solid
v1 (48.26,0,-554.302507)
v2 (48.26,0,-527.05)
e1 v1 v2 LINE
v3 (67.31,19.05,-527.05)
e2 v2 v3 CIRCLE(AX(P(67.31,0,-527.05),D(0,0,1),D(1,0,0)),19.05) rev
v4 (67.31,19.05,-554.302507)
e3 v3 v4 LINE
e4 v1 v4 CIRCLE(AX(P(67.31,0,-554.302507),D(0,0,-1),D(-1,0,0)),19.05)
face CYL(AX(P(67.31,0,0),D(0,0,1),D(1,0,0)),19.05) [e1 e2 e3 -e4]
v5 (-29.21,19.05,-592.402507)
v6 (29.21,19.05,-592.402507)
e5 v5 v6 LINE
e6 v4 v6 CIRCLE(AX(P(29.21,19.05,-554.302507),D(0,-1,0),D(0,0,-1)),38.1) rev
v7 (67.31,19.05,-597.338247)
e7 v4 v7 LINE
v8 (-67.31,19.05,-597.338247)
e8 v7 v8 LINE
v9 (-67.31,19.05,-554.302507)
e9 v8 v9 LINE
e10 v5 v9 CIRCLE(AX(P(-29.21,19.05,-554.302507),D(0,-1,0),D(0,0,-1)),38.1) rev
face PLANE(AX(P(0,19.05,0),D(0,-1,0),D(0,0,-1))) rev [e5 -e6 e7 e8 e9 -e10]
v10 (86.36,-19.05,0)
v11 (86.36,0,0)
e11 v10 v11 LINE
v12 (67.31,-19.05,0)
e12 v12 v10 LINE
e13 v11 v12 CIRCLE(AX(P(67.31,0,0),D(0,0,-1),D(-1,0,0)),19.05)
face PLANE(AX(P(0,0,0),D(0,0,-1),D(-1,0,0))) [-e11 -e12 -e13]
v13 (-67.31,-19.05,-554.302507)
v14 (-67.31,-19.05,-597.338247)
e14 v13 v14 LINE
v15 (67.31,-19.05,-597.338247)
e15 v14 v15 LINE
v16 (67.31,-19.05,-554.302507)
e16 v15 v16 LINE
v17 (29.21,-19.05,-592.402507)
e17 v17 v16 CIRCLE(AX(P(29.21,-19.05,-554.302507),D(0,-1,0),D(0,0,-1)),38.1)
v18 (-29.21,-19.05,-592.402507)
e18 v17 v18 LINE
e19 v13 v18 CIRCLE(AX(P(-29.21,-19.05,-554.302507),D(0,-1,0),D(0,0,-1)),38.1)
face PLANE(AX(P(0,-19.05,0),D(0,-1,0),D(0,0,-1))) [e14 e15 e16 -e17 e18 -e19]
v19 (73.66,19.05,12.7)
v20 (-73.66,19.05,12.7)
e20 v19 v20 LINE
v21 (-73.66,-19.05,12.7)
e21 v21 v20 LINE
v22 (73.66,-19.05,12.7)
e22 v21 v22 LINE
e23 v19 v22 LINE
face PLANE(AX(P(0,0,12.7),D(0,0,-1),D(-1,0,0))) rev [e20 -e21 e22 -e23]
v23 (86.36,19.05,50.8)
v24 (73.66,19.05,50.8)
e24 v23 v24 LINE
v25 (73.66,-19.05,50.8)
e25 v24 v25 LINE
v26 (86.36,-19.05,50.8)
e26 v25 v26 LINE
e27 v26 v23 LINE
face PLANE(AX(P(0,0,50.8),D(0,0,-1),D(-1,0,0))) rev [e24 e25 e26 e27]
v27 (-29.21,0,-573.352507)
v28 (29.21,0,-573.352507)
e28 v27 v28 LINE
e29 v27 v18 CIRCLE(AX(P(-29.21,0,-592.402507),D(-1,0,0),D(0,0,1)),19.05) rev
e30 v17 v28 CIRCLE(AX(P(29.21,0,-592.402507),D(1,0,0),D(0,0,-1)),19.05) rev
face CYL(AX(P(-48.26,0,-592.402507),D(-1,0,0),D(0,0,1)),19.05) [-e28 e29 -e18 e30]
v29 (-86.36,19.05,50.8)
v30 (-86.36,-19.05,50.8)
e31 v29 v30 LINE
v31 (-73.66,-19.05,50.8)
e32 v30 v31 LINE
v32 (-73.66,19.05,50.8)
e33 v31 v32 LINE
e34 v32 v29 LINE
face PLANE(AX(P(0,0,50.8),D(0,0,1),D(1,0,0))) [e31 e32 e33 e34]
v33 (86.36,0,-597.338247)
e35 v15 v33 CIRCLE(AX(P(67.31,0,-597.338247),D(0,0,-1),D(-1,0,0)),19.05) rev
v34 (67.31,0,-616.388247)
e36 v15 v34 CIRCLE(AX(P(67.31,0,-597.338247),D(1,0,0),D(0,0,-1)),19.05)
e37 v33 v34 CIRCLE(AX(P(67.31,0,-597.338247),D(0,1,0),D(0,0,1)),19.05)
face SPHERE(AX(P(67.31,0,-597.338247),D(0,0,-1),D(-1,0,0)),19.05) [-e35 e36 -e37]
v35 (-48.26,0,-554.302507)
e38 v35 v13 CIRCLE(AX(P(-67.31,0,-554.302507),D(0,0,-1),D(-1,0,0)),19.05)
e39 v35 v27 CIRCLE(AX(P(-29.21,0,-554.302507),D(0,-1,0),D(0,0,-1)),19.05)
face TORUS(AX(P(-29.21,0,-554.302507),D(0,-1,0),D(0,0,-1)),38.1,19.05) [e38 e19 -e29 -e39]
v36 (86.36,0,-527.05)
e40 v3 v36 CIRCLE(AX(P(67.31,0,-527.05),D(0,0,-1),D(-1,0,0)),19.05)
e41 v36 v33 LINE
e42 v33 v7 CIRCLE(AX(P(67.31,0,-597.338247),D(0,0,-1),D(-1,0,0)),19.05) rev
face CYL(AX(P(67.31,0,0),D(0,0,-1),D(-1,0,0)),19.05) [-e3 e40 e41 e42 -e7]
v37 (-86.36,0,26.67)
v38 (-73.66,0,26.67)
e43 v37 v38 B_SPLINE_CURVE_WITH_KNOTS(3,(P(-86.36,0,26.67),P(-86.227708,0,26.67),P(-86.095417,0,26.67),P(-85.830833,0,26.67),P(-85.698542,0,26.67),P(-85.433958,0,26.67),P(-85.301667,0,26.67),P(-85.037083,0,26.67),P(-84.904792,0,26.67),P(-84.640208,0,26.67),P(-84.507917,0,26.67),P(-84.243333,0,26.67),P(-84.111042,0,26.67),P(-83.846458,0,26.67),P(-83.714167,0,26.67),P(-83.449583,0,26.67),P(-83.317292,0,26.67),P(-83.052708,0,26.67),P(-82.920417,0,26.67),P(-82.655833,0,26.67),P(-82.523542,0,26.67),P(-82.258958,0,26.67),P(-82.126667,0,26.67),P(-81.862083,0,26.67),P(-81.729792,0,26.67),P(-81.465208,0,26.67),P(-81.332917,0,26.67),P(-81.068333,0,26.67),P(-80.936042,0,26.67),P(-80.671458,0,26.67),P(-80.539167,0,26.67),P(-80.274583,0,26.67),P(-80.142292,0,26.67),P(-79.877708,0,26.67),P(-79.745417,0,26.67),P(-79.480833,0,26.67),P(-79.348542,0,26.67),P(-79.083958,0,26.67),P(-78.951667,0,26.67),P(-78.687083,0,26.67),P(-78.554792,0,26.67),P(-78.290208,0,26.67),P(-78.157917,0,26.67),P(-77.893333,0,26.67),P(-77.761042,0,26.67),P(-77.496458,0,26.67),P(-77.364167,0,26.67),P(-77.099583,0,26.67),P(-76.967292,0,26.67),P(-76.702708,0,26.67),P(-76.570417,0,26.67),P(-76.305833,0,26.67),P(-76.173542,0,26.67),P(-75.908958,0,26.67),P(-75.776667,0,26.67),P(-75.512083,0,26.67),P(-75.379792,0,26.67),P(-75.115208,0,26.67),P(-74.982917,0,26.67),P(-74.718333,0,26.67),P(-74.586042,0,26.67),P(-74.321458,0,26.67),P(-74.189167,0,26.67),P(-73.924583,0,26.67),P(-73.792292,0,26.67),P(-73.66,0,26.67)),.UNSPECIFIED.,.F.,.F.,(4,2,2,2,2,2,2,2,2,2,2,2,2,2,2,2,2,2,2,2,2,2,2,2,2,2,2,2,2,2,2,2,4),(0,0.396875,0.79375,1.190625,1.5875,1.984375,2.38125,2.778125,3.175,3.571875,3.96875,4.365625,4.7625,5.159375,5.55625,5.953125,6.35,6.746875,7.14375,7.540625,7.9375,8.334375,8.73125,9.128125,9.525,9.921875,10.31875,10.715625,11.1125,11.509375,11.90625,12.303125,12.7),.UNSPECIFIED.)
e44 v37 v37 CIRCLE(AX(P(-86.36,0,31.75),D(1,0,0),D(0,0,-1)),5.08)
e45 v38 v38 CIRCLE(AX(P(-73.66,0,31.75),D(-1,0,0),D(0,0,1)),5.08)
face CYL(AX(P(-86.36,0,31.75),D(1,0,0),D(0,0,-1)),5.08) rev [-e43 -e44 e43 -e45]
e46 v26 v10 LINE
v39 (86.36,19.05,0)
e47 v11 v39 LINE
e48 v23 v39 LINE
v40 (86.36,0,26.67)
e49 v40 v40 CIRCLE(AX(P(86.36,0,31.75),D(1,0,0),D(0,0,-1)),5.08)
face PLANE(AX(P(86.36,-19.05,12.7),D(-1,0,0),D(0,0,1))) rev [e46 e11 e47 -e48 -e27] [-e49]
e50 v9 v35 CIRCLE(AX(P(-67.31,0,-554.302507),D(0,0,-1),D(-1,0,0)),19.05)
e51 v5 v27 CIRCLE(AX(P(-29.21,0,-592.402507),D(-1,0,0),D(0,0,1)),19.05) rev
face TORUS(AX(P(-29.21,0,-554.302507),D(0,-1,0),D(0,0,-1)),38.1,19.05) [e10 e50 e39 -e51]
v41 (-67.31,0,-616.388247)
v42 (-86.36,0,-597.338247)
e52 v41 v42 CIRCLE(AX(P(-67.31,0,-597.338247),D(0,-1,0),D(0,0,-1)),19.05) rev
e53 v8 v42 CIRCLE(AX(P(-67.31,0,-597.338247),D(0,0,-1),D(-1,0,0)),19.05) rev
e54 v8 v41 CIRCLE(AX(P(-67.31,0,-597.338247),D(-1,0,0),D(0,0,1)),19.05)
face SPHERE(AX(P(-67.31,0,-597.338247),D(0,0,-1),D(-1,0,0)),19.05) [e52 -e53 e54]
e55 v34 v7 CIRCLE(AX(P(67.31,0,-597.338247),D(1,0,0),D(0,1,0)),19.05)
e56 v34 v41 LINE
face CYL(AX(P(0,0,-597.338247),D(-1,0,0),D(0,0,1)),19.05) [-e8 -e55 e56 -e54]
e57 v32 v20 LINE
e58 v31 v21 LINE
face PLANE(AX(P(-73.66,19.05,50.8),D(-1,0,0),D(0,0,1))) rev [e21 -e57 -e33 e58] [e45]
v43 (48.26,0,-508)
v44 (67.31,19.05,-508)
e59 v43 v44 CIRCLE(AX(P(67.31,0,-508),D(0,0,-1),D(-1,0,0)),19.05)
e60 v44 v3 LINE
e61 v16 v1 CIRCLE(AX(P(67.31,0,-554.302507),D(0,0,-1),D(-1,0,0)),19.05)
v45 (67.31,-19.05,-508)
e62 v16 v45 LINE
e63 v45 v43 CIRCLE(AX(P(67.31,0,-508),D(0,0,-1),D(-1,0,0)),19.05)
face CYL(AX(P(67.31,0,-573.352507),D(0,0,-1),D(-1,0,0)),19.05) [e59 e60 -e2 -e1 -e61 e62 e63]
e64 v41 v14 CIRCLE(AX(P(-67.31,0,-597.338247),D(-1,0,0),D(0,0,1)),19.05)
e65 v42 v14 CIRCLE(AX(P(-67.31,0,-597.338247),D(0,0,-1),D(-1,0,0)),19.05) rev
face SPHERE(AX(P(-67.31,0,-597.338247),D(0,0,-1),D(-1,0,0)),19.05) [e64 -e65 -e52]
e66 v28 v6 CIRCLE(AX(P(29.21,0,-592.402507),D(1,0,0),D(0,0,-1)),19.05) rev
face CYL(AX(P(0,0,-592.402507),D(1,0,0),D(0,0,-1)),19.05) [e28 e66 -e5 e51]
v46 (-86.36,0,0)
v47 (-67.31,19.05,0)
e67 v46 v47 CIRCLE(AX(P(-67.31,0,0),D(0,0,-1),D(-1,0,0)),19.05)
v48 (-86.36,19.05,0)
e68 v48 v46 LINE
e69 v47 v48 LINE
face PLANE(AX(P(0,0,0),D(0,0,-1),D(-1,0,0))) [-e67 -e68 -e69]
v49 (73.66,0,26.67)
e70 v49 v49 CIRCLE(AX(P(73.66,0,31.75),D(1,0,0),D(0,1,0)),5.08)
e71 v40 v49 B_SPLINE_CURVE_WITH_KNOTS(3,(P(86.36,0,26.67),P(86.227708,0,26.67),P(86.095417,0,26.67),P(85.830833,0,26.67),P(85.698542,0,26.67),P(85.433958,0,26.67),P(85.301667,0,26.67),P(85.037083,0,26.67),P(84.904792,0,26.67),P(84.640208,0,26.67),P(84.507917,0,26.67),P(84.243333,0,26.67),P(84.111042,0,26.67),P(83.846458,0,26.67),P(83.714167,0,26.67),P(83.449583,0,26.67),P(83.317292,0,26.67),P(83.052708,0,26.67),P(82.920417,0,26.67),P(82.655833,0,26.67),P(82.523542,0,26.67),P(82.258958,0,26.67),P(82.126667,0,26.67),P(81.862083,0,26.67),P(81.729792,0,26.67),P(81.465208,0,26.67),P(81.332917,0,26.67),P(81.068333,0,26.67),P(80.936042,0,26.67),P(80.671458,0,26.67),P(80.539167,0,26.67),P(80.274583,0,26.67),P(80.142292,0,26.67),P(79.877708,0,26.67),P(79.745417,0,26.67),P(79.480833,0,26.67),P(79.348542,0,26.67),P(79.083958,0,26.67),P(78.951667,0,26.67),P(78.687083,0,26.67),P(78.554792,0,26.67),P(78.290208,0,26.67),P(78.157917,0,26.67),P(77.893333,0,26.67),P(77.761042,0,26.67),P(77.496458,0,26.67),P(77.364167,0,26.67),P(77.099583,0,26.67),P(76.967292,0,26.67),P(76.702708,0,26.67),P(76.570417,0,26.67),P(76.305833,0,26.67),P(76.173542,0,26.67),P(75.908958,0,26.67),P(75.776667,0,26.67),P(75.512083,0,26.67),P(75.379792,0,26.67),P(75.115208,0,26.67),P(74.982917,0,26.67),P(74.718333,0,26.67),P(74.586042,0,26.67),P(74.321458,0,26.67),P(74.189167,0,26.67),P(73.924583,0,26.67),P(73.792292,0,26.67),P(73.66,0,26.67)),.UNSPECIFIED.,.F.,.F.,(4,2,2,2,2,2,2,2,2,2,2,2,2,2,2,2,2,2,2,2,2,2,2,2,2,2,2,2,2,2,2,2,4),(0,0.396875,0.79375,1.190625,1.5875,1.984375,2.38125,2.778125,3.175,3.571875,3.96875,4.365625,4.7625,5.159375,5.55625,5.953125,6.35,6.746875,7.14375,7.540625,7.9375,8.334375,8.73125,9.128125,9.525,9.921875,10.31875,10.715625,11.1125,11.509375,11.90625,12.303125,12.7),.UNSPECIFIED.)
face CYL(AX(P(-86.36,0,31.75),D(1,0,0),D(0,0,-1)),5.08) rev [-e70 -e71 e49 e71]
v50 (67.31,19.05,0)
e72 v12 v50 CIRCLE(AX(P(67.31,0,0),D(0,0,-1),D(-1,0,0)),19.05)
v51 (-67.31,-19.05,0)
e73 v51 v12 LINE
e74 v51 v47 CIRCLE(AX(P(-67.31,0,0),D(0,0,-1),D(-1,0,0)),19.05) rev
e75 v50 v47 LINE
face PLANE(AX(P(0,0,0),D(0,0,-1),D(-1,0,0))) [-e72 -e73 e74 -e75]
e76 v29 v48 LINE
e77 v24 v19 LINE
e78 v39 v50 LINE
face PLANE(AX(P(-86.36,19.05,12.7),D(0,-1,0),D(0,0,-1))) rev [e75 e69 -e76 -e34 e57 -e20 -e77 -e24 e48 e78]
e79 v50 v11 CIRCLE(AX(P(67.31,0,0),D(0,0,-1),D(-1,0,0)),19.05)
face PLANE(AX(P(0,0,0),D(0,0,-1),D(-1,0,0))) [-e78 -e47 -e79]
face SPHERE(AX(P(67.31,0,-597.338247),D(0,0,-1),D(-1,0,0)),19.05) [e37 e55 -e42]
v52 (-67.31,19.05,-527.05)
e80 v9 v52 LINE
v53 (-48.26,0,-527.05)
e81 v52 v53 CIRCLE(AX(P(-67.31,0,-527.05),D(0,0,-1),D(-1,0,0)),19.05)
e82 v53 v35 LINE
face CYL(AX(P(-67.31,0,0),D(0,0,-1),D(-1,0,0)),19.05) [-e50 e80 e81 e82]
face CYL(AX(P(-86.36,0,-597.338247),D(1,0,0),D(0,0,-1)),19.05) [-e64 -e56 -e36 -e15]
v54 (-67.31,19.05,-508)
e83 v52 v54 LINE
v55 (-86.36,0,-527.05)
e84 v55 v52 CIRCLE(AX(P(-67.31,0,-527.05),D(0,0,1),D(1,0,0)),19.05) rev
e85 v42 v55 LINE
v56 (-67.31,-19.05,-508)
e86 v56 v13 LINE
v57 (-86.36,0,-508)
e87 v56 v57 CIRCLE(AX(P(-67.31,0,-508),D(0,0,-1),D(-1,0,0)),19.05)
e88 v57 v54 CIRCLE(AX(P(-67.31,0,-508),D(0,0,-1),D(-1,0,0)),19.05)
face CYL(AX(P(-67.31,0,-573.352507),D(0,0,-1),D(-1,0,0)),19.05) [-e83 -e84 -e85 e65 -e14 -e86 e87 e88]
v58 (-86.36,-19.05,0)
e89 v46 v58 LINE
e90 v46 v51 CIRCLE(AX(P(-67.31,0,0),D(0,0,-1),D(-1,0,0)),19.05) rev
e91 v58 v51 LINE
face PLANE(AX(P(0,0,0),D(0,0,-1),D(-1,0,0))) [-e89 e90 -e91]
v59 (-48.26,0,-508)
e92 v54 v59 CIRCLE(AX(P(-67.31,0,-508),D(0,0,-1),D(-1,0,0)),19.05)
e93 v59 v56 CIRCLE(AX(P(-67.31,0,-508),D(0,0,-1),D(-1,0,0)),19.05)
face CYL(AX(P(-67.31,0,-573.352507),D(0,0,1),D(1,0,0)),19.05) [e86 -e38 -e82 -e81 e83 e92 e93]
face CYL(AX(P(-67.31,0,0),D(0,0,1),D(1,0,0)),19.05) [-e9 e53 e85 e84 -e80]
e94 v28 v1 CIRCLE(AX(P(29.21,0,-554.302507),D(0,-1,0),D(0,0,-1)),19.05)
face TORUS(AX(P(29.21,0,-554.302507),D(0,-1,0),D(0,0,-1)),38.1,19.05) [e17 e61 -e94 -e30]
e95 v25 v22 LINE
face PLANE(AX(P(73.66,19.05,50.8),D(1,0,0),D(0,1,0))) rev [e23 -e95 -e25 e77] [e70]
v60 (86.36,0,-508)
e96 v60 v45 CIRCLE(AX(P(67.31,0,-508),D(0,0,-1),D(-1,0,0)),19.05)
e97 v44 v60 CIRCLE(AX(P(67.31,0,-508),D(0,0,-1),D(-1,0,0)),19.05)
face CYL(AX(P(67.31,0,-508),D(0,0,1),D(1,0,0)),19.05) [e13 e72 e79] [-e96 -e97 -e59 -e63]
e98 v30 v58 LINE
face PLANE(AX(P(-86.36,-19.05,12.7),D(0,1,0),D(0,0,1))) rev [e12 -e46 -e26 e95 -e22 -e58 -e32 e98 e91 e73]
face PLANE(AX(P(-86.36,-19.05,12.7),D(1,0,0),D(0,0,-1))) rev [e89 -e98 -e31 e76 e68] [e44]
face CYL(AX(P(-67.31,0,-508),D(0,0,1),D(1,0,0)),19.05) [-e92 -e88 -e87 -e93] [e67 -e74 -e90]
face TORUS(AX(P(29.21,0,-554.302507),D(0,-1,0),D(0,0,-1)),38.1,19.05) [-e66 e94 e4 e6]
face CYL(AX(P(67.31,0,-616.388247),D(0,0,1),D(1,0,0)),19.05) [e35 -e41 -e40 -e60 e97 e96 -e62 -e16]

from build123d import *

# Parameters (mm, degrees)
SKETCH1_W               = 172.72
SKETCH1_H               = 38.1
BOSS_EXTRUDE1_DEPTH     = 12.7
SKETCH2_W               = 12.7
SKETCH2_H               = 38.1
BOSS_EXTRUDE2_DEPTH     = 38.1
SKETCH3_R               = 19.05
BOSS_EXTRUDE3_DEPTH     = 508
BOSS_EXTRUDE5_DEPTH     = 19.05
FILLET3_R               = 19.05
CUT_EXTRUDE1_DEPTH      = 638.105779031
CUT_EXTRUDE1_DEPTH_BACK = 638.105779031
SKETCH5_R               = 5.08


with BuildPart() as part:
    # Sketch1 → Boss-Extrude1 (new body)
    with BuildSketch(Plane.XY):
        Rectangle(SKETCH1_W, SKETCH1_H)
    extrude(amount=BOSS_EXTRUDE1_DEPTH)

    # Sketch2 → Boss-Extrude2 (add)
    with BuildSketch(Plane.XY.offset(12.7)):
        with Locations((-80.01, 0)):
            Rectangle(SKETCH2_W, SKETCH2_H)
        with Locations((80.01, 0)):
            Rectangle(SKETCH2_W, SKETCH2_H)
    extrude(amount=BOSS_EXTRUDE2_DEPTH)

    # Sketch3 → Boss-Extrude3 (add)
    with BuildSketch(Plane(origin=(0, 0, 0), x_dir=(-1, 0, 0), z_dir=(0, 0, -1))):
        with Locations(Location((-67.31, 0, 0), (0, 0, 180))):
            Circle(SKETCH3_R)
        with Locations((67.31, 0)):
            Circle(SKETCH3_R)
    extrude(amount=BOSS_EXTRUDE3_DEPTH)

    # Sketch4 → Boss-Extrude5 (add, symmetric)
    with BuildSketch(Plane(origin=(0, 0, 0), x_dir=(1, 0, 0), z_dir=(0, 1, 0))):
        Polygon((-86.36, 616.388246785), (86.36, 616.388246785), (86.36, 573.352506856), (86.36, 508), (48.26, 508), (48.26, 573.352506856), (-48.26, 573.352506856), (-48.26, 508), (-86.36, 508), (-86.36, 573.352506856), align=None)
    extrude(amount=BOSS_EXTRUDE5_DEPTH, both=True)

    # Fillet3
    fillet3_edges = [part.edges().sort_by_distance(p)[0] for p in [
        (86.36, -19.05, -562.194123393),
        (0, -19.05, -616.388246785),
        (86.36, 0, -616.388246785),
        (-86.36, -19.05, -562.194123393),
        (-86.36, 0, -616.388246785),
        (-48.26, -19.05, -540.676253428),
        (0, -19.05, -573.352506856),
        (-48.26, 0, -573.352506856),
        (48.26, -19.05, -540.676253428),
        (48.26, 0, -573.352506856),
        (86.36, 19.05, -562.194123393),
        (0, 19.05, -616.388246785),
        (-86.36, 19.05, -562.194123393),
        (-48.26, 19.05, -540.676253428),
        (0, 19.05, -573.352506856),
        (48.26, 19.05, -540.676253428),
    ]]
    fillet(fillet3_edges, radius=FILLET3_R - 0.0001)  # a hair under: the kernel refuses the full size

    # Sketch5 → Cut-Extrude1 (cut, two sides: drawn at the far end of the back side and taken through both)
    with BuildSketch(Plane(origin=(-73.66, 0, 0), x_dir=(0, 0, -1), z_dir=(1, 0, 0)).offset(-CUT_EXTRUDE1_DEPTH_BACK)):
        with Locations((-31.75, 0)):
            Circle(SKETCH5_R)
    extrude(amount=CUT_EXTRUDE1_DEPTH + CUT_EXTRUDE1_DEPTH_BACK, mode=Mode.SUBTRACT)


solid = part.part
